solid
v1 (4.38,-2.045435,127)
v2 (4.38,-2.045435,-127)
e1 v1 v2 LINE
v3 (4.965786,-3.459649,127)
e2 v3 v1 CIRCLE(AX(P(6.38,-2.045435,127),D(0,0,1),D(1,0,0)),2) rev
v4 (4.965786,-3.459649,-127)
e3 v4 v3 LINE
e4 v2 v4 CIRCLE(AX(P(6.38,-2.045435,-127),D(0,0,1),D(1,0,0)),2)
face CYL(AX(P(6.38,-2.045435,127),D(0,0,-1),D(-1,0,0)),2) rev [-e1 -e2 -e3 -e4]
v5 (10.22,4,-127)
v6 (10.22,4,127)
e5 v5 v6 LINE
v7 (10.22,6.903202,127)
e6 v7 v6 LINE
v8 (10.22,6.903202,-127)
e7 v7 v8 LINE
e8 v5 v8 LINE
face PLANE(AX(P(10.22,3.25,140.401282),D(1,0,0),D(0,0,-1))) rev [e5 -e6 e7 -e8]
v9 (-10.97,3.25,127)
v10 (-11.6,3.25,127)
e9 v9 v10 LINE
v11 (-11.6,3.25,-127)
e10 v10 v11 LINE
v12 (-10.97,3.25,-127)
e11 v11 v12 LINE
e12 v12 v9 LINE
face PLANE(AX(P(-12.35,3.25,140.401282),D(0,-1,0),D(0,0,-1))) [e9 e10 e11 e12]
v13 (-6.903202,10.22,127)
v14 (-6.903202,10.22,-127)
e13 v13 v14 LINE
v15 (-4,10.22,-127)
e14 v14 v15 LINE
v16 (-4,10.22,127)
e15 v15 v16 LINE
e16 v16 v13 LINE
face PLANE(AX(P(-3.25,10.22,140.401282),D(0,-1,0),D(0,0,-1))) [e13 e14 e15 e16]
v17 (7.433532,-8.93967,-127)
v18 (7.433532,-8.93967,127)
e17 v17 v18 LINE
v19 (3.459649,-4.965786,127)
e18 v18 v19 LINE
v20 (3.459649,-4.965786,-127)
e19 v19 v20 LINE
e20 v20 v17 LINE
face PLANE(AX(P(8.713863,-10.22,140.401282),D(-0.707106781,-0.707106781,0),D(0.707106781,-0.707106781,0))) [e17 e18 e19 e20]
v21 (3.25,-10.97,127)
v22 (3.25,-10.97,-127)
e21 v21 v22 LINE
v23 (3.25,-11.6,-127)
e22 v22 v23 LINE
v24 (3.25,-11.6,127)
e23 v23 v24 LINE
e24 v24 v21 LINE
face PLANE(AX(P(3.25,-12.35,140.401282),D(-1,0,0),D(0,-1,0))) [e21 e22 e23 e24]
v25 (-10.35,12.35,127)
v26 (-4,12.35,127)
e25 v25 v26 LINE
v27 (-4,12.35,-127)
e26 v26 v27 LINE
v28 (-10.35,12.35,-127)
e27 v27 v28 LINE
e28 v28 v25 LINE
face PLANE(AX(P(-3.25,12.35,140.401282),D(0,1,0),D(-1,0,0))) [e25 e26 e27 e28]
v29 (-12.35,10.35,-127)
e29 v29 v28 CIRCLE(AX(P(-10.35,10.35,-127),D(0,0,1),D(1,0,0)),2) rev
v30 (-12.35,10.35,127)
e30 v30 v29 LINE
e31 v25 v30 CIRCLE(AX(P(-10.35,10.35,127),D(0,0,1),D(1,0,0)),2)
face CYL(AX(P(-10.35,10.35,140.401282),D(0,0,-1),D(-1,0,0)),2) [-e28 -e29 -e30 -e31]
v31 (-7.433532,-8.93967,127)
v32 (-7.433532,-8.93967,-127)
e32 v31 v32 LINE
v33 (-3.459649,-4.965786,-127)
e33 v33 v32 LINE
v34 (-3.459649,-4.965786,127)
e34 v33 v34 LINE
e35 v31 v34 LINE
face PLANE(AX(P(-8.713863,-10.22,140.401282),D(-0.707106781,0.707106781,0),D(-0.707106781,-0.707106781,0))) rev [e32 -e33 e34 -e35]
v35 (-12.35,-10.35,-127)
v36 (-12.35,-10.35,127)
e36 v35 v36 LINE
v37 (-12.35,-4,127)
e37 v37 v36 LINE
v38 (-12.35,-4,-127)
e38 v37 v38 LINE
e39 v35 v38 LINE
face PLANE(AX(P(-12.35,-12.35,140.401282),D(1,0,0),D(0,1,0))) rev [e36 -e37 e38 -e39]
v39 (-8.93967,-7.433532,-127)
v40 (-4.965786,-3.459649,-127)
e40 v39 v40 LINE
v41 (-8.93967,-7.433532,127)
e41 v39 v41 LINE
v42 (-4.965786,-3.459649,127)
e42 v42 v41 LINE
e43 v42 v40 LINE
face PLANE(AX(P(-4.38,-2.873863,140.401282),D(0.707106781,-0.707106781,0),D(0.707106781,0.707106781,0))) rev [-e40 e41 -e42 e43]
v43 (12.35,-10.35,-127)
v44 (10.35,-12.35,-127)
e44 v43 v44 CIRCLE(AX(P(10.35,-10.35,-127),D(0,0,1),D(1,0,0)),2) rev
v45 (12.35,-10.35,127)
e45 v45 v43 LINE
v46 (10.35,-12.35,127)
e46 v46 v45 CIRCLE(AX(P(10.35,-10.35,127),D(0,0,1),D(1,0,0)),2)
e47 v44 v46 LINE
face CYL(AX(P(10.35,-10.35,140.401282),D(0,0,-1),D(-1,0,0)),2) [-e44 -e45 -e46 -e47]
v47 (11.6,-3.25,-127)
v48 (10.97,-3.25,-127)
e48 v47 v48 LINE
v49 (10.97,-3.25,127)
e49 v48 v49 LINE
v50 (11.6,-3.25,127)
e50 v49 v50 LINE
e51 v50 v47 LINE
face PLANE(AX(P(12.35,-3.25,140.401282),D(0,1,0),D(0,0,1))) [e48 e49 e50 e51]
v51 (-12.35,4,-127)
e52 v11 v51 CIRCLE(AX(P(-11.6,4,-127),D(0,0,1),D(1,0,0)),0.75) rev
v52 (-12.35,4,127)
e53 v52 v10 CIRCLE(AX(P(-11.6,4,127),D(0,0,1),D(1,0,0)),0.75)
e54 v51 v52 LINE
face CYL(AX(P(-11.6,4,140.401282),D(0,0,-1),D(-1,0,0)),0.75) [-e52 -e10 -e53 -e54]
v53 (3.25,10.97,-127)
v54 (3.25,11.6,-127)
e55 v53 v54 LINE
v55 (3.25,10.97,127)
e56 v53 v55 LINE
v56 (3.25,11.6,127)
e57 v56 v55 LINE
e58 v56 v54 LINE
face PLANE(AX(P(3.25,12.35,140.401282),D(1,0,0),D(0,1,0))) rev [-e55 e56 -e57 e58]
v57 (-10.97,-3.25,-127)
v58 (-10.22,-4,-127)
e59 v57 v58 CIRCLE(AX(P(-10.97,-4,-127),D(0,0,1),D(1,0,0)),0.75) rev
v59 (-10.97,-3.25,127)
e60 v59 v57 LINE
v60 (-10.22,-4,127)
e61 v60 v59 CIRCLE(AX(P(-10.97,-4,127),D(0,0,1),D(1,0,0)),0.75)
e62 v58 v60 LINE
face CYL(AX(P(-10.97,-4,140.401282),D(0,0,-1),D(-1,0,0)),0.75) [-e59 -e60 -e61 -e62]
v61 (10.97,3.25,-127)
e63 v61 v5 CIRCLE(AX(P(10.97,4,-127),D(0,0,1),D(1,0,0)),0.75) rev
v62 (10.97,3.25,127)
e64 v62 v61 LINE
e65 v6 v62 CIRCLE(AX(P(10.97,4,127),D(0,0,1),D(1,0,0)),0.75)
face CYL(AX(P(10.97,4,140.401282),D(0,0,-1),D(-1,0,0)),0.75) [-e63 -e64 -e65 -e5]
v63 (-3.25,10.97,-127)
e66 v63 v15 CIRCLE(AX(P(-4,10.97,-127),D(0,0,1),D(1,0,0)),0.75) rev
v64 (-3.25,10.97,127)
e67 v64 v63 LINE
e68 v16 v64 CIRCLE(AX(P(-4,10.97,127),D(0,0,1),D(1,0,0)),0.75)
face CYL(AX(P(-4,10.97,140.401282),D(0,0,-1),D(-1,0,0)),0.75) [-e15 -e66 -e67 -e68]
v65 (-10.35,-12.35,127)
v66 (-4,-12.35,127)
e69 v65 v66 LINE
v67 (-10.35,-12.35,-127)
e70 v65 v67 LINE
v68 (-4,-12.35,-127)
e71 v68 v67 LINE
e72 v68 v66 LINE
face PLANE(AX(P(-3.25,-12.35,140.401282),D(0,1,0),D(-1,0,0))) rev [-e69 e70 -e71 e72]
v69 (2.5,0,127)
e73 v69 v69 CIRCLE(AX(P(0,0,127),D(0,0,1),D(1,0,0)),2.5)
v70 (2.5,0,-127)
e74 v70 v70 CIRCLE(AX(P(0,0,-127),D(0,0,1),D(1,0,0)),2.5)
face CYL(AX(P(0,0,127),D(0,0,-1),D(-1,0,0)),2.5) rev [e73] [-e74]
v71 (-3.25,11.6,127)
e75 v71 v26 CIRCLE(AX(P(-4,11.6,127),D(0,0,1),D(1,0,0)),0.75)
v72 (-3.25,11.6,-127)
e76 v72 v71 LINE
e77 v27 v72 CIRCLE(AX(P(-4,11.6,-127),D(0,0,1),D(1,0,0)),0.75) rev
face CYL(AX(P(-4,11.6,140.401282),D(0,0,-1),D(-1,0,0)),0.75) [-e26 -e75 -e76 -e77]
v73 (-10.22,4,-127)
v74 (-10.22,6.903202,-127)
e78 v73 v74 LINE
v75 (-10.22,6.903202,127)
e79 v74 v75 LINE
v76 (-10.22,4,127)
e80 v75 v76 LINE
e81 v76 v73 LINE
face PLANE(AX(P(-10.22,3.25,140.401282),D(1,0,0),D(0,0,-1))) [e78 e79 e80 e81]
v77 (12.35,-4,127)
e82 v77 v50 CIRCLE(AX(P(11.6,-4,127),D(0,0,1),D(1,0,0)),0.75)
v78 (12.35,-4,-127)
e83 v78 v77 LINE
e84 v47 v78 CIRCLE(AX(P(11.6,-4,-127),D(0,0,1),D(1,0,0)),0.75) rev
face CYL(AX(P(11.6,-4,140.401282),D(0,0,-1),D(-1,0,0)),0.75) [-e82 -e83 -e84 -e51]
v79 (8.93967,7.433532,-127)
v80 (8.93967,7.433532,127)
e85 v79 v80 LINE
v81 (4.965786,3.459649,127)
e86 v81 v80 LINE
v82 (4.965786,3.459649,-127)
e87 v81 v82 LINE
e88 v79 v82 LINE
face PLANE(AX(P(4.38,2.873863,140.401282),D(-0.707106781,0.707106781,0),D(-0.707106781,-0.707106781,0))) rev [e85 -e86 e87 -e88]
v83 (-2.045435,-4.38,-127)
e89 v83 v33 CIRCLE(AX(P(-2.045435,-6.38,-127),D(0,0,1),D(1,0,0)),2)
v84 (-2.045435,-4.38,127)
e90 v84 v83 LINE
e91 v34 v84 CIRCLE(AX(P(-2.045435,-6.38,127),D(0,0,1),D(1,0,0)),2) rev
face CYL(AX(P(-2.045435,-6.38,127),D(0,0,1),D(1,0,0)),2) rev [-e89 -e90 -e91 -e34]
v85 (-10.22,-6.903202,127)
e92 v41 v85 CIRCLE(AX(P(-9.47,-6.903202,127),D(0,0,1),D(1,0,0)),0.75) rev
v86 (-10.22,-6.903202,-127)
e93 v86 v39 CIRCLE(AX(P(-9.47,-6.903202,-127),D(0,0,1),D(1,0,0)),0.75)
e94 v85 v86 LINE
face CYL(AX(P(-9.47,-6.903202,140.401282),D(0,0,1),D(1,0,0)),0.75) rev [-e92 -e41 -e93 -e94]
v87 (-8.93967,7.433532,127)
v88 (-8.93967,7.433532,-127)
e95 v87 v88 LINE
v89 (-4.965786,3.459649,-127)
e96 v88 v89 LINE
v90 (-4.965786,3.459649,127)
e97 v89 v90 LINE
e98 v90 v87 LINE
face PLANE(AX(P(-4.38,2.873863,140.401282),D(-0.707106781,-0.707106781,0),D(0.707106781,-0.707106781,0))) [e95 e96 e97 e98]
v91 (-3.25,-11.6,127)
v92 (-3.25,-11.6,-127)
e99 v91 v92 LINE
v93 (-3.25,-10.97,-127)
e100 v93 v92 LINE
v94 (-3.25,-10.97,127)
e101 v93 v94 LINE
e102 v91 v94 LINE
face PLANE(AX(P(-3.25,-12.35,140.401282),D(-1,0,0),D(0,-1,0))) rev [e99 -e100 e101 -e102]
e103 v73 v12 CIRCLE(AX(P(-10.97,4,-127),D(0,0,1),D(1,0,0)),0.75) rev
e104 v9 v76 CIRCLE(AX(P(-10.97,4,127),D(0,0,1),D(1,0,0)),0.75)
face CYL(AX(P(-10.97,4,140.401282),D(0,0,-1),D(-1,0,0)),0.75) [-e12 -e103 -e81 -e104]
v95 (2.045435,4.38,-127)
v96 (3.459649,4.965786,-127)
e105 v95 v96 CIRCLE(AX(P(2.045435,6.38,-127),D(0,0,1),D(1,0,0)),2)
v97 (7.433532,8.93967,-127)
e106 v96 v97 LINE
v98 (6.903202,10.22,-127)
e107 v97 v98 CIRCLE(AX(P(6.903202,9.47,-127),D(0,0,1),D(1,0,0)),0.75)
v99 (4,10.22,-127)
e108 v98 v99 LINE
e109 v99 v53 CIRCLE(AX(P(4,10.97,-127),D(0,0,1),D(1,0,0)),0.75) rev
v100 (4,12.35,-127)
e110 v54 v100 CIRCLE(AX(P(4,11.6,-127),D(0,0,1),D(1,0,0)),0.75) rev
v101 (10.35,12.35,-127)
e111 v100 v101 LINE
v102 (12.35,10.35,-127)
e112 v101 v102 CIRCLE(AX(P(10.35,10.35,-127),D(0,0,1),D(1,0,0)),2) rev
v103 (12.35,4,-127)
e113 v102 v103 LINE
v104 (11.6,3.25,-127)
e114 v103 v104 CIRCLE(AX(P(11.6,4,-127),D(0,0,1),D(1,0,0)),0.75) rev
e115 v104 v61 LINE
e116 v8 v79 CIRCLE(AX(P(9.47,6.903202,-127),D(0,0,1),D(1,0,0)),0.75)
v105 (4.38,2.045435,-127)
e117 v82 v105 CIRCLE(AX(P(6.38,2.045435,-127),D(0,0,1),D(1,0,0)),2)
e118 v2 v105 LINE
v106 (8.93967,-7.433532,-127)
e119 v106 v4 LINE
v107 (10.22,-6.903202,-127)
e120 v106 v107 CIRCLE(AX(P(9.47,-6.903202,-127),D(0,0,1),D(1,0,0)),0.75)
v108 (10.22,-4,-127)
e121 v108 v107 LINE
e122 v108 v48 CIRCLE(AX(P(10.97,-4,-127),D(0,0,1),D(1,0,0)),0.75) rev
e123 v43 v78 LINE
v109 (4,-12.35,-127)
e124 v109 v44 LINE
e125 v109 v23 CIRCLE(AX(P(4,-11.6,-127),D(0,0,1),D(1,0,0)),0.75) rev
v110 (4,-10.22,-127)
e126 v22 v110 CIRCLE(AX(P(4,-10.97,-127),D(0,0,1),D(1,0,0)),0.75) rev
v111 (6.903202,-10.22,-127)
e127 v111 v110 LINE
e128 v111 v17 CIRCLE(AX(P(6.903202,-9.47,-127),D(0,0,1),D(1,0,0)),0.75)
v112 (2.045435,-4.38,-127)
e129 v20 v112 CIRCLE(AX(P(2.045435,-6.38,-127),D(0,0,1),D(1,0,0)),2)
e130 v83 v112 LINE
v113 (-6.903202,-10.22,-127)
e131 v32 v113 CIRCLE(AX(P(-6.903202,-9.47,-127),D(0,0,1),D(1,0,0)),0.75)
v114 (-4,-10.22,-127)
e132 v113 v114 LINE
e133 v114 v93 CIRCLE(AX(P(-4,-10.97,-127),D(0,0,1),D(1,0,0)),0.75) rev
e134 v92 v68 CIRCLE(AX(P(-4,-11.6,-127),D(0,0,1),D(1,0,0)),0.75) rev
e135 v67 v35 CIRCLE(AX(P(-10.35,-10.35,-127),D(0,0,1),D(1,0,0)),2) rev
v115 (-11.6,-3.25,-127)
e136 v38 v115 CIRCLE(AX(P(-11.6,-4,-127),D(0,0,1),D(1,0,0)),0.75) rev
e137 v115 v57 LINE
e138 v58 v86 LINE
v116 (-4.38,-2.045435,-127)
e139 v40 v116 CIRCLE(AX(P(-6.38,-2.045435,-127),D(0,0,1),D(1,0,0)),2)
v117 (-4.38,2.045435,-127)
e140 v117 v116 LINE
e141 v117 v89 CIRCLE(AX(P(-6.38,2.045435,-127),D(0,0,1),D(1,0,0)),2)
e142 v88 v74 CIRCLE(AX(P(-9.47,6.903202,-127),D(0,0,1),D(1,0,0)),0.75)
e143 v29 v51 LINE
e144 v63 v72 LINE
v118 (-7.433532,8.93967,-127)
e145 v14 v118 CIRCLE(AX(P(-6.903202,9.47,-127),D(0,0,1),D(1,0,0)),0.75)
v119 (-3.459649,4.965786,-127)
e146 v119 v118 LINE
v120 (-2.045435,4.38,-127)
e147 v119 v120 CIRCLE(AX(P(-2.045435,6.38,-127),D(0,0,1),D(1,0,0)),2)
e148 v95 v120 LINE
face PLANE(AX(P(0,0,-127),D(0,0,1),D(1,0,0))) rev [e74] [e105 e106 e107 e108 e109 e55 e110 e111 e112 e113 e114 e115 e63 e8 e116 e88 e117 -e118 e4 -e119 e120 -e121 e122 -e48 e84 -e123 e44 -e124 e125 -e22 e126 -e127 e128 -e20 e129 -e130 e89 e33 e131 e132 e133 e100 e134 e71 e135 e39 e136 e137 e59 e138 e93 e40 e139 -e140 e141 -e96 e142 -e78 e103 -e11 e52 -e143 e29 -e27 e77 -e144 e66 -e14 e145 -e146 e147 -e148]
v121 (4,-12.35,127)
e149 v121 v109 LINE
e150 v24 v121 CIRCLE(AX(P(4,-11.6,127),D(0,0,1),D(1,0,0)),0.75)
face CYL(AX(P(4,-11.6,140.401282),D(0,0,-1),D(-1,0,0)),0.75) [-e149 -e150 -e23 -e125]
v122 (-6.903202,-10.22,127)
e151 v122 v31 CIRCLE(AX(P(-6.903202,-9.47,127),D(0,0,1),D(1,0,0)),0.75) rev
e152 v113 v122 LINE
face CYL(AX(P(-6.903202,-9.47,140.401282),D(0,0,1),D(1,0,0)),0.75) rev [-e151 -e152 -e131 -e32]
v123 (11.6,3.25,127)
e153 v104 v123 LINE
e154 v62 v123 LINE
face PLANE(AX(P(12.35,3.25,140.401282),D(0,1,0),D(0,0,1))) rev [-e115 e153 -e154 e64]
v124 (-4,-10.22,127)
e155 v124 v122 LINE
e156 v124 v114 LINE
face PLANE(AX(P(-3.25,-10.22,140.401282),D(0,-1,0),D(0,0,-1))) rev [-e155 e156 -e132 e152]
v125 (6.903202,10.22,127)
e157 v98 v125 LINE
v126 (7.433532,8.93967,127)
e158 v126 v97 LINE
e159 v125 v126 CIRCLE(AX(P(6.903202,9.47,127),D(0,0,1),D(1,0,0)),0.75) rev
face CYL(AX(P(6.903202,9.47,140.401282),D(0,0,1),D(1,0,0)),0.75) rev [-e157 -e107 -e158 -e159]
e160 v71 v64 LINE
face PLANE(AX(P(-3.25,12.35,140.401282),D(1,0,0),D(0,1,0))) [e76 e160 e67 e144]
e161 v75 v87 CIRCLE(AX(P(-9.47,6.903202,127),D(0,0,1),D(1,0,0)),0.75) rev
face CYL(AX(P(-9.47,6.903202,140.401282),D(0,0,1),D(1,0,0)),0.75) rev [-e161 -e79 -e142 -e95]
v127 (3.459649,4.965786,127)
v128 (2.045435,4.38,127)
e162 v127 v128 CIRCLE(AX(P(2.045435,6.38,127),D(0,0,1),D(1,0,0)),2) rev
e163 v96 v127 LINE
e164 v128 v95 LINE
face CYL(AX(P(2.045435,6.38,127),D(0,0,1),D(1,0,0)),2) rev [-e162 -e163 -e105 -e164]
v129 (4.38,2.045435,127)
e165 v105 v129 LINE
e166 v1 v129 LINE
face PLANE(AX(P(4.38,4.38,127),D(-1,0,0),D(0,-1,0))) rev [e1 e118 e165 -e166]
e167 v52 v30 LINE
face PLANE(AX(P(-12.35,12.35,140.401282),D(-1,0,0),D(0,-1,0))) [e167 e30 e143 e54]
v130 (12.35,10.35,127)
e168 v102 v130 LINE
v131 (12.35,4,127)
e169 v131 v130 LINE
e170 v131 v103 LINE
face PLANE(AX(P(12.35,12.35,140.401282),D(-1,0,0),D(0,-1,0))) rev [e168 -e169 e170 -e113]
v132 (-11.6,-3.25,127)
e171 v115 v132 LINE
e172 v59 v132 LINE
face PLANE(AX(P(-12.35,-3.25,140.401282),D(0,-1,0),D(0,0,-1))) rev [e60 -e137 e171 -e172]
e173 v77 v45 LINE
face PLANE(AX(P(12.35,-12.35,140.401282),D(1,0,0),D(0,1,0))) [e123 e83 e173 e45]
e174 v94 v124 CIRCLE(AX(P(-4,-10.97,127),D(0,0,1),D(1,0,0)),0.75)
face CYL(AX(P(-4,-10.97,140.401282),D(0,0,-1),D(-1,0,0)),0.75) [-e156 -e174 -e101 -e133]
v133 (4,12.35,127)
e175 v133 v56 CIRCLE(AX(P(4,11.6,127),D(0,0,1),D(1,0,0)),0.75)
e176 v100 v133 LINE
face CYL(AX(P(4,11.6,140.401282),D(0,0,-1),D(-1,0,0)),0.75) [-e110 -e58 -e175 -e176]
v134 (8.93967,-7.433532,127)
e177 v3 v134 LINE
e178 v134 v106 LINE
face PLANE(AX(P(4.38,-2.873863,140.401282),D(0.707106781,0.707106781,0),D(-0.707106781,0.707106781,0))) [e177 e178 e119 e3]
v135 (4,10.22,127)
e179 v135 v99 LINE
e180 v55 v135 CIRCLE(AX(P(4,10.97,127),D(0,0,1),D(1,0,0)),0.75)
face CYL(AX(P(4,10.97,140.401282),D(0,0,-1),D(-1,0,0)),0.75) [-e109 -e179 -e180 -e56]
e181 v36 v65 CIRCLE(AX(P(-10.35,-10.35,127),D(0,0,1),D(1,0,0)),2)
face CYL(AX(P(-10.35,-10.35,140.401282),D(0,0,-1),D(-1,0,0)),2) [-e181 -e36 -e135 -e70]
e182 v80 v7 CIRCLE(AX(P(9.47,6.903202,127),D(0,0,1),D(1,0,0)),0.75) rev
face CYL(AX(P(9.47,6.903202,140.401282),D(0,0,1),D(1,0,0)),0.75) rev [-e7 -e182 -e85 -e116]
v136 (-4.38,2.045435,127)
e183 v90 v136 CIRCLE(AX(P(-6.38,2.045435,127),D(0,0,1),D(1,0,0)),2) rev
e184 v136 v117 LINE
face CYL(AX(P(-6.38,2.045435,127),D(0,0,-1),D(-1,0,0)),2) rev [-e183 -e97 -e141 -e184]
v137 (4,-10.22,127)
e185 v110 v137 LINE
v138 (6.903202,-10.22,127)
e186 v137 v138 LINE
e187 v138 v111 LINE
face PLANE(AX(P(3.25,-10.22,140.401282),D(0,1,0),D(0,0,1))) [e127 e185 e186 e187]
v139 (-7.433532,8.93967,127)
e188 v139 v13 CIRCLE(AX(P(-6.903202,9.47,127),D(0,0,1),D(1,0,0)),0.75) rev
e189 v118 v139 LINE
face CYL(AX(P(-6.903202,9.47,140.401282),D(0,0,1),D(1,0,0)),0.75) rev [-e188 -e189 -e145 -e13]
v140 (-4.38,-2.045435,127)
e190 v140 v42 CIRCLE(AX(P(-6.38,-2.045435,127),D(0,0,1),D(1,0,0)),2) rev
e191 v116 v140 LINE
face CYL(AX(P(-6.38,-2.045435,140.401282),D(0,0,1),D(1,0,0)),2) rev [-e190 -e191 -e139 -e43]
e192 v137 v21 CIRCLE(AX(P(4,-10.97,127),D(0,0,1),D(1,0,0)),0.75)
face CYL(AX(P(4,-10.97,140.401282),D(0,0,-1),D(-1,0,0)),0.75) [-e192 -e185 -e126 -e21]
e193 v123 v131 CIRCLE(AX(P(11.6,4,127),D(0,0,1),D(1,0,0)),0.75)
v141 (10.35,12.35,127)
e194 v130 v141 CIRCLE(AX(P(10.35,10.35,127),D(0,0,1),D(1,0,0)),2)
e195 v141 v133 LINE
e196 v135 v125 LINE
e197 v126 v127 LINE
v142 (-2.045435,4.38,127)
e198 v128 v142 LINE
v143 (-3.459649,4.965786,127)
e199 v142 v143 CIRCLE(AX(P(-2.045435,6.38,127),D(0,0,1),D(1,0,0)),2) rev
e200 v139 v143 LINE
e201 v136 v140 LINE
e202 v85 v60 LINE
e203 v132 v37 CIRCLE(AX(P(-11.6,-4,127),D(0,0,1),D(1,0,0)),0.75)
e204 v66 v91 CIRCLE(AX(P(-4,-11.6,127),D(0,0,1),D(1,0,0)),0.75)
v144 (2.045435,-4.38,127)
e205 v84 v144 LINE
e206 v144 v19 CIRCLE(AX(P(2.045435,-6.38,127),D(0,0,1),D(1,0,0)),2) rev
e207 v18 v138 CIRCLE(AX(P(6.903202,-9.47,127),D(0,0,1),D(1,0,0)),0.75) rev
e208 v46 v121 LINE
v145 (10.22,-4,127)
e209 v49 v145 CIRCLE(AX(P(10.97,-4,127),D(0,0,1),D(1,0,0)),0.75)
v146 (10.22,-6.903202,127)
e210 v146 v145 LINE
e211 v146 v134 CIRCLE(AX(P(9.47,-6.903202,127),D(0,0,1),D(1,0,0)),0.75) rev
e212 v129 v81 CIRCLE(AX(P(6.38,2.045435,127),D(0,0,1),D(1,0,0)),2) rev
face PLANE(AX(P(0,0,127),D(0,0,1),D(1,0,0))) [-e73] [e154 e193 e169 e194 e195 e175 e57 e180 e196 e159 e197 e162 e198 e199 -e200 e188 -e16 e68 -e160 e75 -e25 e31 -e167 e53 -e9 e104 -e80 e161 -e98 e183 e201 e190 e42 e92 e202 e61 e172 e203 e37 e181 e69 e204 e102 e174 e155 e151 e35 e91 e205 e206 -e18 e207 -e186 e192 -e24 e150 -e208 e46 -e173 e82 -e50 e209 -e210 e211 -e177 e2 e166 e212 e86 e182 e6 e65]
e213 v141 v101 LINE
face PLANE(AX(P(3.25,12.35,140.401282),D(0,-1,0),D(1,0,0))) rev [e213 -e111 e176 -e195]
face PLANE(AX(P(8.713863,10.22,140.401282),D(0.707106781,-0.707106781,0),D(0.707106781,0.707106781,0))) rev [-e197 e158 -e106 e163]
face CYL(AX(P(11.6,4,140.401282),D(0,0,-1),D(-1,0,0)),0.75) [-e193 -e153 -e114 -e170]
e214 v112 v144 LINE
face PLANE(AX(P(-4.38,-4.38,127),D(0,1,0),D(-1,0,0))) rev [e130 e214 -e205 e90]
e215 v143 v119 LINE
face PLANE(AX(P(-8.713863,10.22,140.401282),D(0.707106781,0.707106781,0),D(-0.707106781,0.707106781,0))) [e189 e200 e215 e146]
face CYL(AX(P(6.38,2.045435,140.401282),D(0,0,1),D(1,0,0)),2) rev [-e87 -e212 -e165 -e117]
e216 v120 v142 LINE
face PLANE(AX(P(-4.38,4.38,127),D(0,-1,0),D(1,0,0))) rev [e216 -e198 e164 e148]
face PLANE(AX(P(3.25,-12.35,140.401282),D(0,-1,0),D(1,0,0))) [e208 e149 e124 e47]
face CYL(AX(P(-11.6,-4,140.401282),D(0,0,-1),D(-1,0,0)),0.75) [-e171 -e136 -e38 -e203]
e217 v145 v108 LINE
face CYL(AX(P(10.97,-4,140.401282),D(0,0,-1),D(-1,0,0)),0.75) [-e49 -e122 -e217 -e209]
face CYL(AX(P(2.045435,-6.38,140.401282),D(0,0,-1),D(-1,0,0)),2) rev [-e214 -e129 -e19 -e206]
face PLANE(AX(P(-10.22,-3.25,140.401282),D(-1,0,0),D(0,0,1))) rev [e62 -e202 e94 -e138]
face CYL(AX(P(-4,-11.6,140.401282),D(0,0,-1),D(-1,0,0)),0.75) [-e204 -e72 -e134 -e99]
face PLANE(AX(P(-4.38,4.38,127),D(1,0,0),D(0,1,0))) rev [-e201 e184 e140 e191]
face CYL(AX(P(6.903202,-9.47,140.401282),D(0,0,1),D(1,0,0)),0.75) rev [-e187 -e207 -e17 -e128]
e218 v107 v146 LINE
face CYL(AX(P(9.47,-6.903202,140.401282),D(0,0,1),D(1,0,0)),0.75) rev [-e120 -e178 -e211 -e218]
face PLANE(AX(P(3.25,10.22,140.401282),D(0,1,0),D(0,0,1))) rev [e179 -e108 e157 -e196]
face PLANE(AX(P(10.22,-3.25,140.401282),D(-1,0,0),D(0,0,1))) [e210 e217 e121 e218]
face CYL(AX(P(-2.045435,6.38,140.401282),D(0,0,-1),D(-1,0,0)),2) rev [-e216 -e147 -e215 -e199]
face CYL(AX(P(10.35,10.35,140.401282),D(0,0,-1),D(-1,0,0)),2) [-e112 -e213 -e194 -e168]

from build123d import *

# Parameters (mm, degrees)
SKETCH2_W            = 8.76
SKETCH2_H            = 8.76
SKETCH2_R            = 2.5
BOSS_EXTRUDE1_DEPTH  = 127
BOSS_EXTRUDE2_START  = -127
BOSS_EXTRUDE2_DEPTH  = 254
FILLET1_R            = 0.75
FILLET1_OF_MIRROR1_R = 0.75
MIRROR2_START        = -127
MIRROR2_DEPTH        = 254
FILLET2_R            = 2


# Read off the part's stored shape, not the designer's step: Mirror2
with BuildPart() as part:
    # Sketch2 → Boss-Extrude1 (new, symmetric)
    with BuildSketch(Plane.XY):
        Rectangle(SKETCH2_W, SKETCH2_H)
        Circle(SKETCH2_R, mode=Mode.SUBTRACT)
    extrude(amount=BOSS_EXTRUDE1_DEPTH, both=True)

    # Sketch3 → Boss-Extrude2 (add)
    with BuildSketch(Plane.XY.offset(BOSS_EXTRUDE2_START)):
        Polygon((3.25, 12.35), (12.35, 12.35), (12.35, 3.25), (10.22, 3.25), (10.22, 8.713862556), (4.38, 2.873862556), (4.38, 4.38), (2.873862556, 4.38), (8.713862556, 10.22), (3.25, 10.22), align=None)
    boss_extrude2 = extrude(amount=BOSS_EXTRUDE2_DEPTH)

    # Fillet1
    fillet1_edges = [part.edges().sort_by_distance(p)[0] for p in [
        (3.25, 12.35, 0),
        (3.25, 10.22, 0),
        (8.713862556, 10.22, 0),
        (10.22, 8.713862556, 0),
        (10.22, 3.25, 0),
        (12.35, 3.25, 0),
    ]]
    fillet(fillet1_edges, radius=FILLET1_R)

    # Mirror1: Boss-Extrude2 across plane
    add(boss_extrude2.mirror(Plane.ZX))

    # Fillet1 of Mirror1
    fillet1_of_mirror1_edges = [part.edges().sort_by_distance(p)[0] for p in [
        (3.25, -12.35, 0),
        (3.25, -10.22, 0),
        (8.713862556, -10.22, 0),
        (10.22, -8.713862556, 0),
        (10.22, -3.25, 0),
        (12.35, -3.25, 0),
    ]]
    fillet(fillet1_of_mirror1_edges, radius=FILLET1_OF_MIRROR1_R)

    # Mirror2 outline → Mirror2 (add)
    with BuildSketch(Plane.XY.offset(MIRROR2_START)):
        with BuildLine():
            ThreePointArc((-7.43353247, 8.939669914), (-7.596112034, 9.757012574), (-6.903202384, 10.22))
            Line((-6.903202384, 10.22), (-4, 10.22))
            ThreePointArc((-4, 10.22), (-3.469669914, 10.439669914), (-3.25, 10.97))
            Line((-3.25, 10.97), (-3.25, 11.6))
            ThreePointArc((-3.25, 11.6), (-3.469669914, 12.130330086), (-4, 12.35))
            Line((-4, 12.35), (-12.35, 12.35))
            Line((-12.35, 12.35), (-12.35, 4))
            ThreePointArc((-12.35, 4), (-12.130330086, 3.469669914), (-11.6, 3.25))
            Line((-11.6, 3.25), (-10.97, 3.25))
            ThreePointArc((-10.97, 3.25), (-10.439669914, 3.469669914), (-10.22, 4))
            Line((-10.22, 4), (-10.22, 6.903202384))
            ThreePointArc((-10.22, 6.903202384), (-9.757012574, 7.596112034), (-8.939669914, 7.43353247))
            Line((-8.939669914, 7.43353247), (-4.38, 2.873862556))
            Line((-4.38, 2.873862556), (-4.38, 4.38))
            Line((-4.38, 4.38), (-2.873862556, 4.38))
            Line((-2.873862556, 4.38), (-7.43353247, 8.939669914))
        make_face()
        with BuildLine():
            Line((-4.38, -4.38), (-4.38, -2.873862556))
            Line((-4.38, -2.873862556), (-8.939669914, -7.43353247))
            ThreePointArc((-8.939669914, -7.43353247), (-9.757012574, -7.596112034), (-10.22, -6.903202384))
            Line((-10.22, -6.903202384), (-10.22, -4))
            ThreePointArc((-10.22, -4), (-10.439669914, -3.469669914), (-10.97, -3.25))
            Line((-10.97, -3.25), (-11.6, -3.25))
            ThreePointArc((-11.6, -3.25), (-12.130330086, -3.469669914), (-12.35, -4))
            Line((-12.35, -4), (-12.35, -12.35))
            Line((-12.35, -12.35), (-4, -12.35))
            ThreePointArc((-4, -12.35), (-3.469669914, -12.130330086), (-3.25, -11.6))
            Line((-3.25, -11.6), (-3.25, -10.97))
            ThreePointArc((-3.25, -10.97), (-3.469669914, -10.439669914), (-4, -10.22))
            Line((-4, -10.22), (-6.903202384, -10.22))
            ThreePointArc((-6.903202384, -10.22), (-7.596112034, -9.757012574), (-7.43353247, -8.939669914))
            Line((-7.43353247, -8.939669914), (-2.873862556, -4.38))
            Line((-2.873862556, -4.38), (-4.38, -4.38))
        make_face()
    extrude(amount=MIRROR2_DEPTH)

    # Fillet2
    fillet2_edges = [part.edges().sort_by_distance(p)[0] for p in [
        (-2.873862556, -4.38, 0),
        (-4.38, -2.873862556, 0),
        (-12.35, -12.35, 0),
        (2.873862556, 4.38, 0),
        (4.38, 2.873862556, 0),
        (12.35, 12.35, 0),
        (-2.873862556, 4.38, 0),
        (-4.38, 2.873862556, 0),
        (-12.35, 12.35, 0),
        (2.873862556, -4.38, 0),
        (4.38, -2.873862556, 0),
        (12.35, -12.35, 0),
    ]]
    fillet(fillet2_edges, radius=FILLET2_R)


solid = part.part
